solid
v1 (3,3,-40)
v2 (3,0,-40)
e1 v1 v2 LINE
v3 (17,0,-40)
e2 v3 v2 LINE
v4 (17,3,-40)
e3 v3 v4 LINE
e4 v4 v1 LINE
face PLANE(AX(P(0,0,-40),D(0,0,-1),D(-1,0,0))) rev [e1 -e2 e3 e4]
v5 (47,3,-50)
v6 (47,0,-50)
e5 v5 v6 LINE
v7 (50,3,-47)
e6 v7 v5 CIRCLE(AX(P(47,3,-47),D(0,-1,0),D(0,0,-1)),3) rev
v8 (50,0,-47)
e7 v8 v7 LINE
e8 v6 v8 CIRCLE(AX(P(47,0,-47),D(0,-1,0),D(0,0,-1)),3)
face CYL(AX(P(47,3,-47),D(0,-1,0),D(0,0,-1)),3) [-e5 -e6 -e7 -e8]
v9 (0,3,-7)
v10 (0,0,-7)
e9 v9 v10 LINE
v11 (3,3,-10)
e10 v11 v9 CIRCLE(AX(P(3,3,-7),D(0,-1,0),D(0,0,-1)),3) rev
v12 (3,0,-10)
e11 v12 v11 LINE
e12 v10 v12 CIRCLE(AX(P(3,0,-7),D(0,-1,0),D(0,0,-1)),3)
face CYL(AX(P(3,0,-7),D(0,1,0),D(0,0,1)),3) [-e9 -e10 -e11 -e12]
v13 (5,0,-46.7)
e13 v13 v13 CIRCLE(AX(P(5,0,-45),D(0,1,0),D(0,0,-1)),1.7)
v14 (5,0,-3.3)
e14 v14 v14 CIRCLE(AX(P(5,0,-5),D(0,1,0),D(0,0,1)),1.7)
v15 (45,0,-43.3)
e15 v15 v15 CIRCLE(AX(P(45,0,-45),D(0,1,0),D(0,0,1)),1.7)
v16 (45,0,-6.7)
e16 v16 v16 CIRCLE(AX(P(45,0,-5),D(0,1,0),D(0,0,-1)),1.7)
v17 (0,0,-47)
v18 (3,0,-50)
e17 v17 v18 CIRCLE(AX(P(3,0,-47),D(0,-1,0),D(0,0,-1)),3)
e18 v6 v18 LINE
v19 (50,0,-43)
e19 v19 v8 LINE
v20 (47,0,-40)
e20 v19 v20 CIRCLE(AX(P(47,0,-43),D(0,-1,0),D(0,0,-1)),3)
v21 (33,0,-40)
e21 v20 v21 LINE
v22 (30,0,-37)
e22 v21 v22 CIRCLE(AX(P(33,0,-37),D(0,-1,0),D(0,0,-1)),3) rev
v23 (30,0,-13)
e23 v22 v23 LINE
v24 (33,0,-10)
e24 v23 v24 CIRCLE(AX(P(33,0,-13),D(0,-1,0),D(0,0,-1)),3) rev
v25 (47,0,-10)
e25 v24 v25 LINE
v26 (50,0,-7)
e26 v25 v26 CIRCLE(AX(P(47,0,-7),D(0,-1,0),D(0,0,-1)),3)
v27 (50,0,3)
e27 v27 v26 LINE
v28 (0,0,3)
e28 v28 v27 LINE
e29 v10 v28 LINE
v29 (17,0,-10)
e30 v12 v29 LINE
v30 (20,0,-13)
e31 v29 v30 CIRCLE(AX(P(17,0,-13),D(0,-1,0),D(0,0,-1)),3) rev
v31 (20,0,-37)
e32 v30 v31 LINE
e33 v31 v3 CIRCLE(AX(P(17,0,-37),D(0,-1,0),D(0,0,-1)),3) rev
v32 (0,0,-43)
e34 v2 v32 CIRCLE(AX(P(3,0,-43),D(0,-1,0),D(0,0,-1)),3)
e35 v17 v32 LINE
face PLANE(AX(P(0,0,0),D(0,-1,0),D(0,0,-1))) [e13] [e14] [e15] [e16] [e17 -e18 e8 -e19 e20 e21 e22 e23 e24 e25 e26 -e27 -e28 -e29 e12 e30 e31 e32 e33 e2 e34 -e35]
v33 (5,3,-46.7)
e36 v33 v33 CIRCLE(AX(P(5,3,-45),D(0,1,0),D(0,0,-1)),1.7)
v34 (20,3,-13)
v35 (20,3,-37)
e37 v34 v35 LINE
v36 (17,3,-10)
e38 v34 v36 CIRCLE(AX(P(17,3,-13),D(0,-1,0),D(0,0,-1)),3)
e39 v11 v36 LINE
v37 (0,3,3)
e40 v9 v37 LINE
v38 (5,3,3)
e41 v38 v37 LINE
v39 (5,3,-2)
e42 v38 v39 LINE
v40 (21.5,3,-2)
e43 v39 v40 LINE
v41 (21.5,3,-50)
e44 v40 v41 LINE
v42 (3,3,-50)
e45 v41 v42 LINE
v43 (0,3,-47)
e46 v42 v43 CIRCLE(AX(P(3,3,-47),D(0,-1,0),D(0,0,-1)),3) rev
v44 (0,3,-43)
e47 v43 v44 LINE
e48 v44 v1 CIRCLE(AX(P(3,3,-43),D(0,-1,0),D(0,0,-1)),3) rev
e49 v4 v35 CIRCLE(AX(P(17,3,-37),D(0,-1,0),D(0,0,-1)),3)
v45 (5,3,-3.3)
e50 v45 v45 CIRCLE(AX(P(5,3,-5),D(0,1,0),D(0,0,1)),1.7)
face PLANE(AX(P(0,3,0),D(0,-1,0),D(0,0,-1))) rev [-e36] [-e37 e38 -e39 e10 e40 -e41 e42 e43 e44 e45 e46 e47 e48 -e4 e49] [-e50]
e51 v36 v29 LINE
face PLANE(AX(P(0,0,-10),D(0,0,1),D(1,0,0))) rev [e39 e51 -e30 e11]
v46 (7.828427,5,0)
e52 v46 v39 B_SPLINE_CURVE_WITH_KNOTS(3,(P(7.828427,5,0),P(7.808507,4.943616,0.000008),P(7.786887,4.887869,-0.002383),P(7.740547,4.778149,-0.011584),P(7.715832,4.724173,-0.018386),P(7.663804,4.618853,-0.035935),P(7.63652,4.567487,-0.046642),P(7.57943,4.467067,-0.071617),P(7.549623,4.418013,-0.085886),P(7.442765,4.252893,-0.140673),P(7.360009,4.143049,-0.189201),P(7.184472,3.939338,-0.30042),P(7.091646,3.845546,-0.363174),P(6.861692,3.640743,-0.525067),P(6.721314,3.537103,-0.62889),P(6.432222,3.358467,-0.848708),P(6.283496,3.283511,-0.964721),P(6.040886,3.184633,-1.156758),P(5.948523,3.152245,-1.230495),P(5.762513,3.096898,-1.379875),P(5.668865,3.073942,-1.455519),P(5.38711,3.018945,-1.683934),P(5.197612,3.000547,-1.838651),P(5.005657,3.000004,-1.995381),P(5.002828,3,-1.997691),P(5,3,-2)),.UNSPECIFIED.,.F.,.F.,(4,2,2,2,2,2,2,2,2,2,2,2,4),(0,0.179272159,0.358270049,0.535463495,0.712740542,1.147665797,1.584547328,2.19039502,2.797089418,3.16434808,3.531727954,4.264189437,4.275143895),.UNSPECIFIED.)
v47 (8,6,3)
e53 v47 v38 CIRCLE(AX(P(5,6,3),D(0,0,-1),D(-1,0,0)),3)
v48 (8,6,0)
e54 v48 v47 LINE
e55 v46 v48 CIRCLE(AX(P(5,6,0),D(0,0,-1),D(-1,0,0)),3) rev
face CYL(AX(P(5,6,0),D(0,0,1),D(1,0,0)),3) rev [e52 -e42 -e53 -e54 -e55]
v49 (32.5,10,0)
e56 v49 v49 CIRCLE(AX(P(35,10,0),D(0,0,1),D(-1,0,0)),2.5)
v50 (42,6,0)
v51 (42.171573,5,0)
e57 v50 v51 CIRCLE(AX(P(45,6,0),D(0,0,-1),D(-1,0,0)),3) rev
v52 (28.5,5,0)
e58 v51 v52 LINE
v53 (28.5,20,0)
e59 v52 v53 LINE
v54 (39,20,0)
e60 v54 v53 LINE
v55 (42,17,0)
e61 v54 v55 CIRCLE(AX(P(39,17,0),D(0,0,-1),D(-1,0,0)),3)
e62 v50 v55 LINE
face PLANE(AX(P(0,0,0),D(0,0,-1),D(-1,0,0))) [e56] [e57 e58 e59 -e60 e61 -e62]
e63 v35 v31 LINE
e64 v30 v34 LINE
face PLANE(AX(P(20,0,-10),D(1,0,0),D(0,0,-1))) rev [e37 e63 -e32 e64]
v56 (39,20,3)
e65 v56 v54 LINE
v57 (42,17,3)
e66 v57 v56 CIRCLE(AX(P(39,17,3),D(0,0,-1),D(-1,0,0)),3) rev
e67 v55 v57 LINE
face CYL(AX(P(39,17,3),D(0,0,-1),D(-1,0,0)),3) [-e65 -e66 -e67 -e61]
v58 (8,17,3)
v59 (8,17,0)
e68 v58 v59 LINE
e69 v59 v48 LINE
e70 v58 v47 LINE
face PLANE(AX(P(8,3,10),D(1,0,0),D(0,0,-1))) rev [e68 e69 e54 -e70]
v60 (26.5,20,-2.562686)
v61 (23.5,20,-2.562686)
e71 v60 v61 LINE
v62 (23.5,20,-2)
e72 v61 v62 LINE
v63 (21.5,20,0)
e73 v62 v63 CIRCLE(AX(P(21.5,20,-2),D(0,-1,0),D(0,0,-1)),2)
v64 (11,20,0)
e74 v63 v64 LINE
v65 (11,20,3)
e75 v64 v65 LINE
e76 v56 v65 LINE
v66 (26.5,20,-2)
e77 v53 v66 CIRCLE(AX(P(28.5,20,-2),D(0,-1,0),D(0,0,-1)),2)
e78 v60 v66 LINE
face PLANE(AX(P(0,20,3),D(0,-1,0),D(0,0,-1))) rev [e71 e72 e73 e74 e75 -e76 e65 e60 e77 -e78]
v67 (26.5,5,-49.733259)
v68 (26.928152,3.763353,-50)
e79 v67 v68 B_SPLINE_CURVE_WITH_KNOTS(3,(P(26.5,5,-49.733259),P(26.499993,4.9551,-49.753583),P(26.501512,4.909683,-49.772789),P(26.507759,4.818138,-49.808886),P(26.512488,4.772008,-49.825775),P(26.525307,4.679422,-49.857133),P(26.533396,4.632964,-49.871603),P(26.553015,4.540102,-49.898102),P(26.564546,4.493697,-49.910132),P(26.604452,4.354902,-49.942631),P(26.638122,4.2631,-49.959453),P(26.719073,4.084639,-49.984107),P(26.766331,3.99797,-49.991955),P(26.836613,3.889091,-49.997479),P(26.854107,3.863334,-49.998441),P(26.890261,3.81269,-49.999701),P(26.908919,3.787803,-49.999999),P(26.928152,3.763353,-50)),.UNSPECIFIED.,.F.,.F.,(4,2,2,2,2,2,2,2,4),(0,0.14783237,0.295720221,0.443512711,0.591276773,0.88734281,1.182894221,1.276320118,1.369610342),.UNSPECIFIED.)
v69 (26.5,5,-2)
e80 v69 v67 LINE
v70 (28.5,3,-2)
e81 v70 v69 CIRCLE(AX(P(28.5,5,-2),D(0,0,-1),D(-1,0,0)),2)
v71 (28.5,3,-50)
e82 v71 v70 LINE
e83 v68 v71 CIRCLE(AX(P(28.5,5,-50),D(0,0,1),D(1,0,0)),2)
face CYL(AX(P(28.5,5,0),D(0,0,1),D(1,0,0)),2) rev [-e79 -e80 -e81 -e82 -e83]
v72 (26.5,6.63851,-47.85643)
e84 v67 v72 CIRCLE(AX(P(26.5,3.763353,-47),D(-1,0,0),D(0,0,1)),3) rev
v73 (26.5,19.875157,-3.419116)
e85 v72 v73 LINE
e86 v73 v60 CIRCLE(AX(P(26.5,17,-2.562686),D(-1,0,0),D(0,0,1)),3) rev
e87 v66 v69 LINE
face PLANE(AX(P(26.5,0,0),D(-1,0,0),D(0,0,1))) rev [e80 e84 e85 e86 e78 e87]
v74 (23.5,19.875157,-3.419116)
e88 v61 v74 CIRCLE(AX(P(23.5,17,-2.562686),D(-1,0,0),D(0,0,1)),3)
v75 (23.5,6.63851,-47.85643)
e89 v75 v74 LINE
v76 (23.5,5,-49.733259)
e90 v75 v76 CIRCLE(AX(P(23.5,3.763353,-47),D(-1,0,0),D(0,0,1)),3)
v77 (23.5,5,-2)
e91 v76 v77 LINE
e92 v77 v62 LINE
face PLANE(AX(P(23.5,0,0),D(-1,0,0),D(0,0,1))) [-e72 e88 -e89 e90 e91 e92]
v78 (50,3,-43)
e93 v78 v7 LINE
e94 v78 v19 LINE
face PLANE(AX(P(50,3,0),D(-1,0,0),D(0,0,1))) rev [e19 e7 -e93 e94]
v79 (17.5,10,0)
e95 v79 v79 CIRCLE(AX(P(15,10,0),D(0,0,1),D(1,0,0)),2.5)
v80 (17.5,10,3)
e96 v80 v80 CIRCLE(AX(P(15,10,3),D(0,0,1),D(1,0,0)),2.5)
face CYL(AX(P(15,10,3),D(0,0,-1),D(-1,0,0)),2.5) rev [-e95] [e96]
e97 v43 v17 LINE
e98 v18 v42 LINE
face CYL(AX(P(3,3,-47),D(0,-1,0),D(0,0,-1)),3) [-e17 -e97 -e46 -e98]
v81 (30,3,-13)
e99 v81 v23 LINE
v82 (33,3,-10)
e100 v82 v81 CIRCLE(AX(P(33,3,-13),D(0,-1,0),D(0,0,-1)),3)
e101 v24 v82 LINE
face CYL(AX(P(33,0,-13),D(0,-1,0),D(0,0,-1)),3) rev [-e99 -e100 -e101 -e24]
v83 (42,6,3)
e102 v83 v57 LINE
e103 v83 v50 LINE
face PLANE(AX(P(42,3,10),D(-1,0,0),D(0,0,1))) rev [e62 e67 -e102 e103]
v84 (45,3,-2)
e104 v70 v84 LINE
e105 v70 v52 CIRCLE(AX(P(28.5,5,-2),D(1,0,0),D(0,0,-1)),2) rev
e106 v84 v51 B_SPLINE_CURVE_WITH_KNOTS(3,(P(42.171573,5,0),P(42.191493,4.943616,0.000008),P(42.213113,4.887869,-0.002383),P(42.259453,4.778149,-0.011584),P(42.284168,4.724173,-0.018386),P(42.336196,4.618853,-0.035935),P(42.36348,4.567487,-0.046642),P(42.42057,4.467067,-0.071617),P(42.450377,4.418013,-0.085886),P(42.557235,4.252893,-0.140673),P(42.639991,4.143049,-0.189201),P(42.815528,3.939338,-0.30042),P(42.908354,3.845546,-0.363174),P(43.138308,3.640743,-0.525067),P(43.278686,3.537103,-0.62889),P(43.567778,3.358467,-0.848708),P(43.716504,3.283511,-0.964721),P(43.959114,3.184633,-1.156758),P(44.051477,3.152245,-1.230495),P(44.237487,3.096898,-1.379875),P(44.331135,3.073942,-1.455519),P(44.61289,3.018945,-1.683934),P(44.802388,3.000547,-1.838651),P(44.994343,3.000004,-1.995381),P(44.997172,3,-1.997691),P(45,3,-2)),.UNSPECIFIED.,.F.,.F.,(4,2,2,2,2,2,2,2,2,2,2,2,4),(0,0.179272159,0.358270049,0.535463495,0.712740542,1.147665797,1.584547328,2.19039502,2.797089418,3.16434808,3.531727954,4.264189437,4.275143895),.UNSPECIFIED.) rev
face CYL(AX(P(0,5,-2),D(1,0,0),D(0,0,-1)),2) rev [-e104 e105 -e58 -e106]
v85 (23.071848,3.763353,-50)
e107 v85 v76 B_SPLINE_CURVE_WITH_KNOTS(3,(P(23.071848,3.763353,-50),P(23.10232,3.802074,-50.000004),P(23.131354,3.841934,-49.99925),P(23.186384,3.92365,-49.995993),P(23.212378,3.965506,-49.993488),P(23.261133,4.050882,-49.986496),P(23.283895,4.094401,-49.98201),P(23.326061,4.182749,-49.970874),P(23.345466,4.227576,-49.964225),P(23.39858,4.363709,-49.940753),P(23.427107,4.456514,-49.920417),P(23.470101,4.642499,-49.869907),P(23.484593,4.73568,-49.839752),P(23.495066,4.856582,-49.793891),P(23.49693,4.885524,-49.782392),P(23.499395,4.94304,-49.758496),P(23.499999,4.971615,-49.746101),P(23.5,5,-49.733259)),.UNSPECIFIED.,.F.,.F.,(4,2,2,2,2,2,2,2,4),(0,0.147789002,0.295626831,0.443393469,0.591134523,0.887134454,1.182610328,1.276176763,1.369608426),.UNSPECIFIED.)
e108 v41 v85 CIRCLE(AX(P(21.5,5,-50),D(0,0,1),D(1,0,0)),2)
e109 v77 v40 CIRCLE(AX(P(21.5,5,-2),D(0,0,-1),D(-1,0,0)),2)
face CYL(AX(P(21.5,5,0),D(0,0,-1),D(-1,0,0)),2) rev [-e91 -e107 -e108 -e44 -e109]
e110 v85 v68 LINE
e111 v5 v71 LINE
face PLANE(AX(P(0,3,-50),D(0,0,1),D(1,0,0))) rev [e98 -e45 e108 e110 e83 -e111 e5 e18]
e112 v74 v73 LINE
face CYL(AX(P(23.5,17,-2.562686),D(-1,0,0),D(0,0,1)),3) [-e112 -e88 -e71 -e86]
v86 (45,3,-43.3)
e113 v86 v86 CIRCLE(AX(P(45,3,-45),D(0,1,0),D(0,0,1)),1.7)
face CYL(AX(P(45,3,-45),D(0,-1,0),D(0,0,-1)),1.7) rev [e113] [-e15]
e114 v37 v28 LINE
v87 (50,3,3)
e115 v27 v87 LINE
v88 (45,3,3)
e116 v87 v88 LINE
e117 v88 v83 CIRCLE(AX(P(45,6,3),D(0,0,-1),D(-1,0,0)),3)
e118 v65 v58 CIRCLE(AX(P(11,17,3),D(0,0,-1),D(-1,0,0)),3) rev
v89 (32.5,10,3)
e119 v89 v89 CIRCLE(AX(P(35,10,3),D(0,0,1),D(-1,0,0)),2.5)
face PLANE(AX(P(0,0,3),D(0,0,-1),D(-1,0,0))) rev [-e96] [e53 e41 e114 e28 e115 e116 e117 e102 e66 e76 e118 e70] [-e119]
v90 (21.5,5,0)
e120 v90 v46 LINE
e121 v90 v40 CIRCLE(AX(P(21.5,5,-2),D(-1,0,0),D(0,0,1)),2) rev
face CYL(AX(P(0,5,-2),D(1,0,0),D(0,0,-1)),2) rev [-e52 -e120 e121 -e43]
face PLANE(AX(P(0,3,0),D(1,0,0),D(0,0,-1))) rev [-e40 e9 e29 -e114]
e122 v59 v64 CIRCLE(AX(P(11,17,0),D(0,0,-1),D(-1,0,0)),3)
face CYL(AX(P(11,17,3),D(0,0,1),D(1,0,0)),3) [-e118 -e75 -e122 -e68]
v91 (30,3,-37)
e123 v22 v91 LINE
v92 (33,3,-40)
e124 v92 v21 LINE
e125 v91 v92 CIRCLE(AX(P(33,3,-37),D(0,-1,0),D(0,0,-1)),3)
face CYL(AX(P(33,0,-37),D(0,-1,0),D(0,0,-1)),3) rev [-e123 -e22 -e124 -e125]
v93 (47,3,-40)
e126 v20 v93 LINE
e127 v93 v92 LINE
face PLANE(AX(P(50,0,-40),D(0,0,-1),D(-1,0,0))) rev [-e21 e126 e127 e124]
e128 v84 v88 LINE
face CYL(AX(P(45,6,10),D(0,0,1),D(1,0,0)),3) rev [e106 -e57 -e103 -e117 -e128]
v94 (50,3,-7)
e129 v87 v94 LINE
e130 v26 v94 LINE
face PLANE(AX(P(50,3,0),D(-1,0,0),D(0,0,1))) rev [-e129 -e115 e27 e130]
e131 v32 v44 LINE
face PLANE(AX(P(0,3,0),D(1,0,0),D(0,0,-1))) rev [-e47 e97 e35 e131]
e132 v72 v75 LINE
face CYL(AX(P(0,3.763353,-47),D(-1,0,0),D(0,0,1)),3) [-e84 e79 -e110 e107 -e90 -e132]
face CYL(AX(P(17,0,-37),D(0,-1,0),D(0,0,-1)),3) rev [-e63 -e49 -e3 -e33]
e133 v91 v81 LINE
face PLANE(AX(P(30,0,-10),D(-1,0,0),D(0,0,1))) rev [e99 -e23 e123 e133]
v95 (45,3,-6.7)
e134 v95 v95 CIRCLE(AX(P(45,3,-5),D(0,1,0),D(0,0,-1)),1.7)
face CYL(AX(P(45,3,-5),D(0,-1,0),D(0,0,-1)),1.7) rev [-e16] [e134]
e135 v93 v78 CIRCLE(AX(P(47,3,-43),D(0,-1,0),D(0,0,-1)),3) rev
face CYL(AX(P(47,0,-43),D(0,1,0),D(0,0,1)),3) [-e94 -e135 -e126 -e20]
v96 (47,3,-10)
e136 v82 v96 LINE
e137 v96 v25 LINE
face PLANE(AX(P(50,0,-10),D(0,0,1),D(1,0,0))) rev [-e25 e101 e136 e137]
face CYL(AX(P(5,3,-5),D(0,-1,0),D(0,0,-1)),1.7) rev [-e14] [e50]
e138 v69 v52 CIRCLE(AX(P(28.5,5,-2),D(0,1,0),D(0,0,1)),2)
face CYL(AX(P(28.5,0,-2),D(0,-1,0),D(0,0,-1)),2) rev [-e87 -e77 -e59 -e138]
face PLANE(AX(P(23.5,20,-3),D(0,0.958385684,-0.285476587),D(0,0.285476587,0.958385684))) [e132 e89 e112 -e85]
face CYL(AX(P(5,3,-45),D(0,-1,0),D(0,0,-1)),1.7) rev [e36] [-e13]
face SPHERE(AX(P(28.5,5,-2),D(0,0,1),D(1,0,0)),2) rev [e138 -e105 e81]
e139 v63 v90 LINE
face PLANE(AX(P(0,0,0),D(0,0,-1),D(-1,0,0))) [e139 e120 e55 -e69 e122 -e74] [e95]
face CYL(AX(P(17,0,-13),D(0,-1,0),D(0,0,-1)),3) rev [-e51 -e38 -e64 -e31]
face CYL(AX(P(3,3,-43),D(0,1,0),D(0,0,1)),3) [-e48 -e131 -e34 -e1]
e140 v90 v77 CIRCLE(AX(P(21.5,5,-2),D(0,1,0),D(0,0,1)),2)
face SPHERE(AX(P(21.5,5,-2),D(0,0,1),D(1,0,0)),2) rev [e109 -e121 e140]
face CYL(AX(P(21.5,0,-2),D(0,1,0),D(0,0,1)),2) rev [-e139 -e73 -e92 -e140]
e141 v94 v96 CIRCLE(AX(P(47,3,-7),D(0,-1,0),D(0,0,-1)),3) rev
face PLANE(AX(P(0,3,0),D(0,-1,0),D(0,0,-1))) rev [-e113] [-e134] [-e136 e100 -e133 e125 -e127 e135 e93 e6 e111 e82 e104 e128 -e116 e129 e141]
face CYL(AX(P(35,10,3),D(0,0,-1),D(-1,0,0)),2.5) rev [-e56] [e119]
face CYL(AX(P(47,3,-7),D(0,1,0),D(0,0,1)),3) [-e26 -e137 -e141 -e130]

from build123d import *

# Parameters (mm, degrees)
ESQUISSE1_W             = 50
ESQUISSE1_H             = 50
ESQUISSE1_R             = 1.7
BOSS_EXTRU_1_DEPTH      = 3
ESQUISSE2_W             = 50
ESQUISSE2_H             = 20
ESQUISSE2_R             = 2.5
BOSS_EXTRU_2_DEPTH      = 3
BOSS_EXTRU_3_DEPTH      = 1.5
BOSS_EXTRU_3_DEPTH_BACK = 1.5
ESQUISSE5_W             = 8
ESQUISSE5_H             = 17
ENL_V_MAT_EXTRU_2_DEPTH = 10
CONG_1_R                = 3
CONG_2_R                = 3
CONG_3_R                = 2
ESQUISSE4_W             = 20
ESQUISSE4_H             = 30
ENL_V_MAT_EXTRU_1_DEPTH = 73.725511411
CONG_4_R                = 3


with BuildPart() as part:
    # Esquisse1 → Boss.-Extru.1 (new body)
    with BuildSketch(Plane(origin=(0, 0, 0), x_dir=(1, 0, 0), z_dir=(0, 1, 0))):
        with Locations((25, 25)):
            Rectangle(ESQUISSE1_W, ESQUISSE1_H)
        with Locations(Location((5, 5, 0), (0, 0, 270))):
            Circle(ESQUISSE1_R, mode=Mode.SUBTRACT)
        with Locations(Location((5, 45, 0), (0, 0, 90))):
            Circle(ESQUISSE1_R, mode=Mode.SUBTRACT)
        with Locations(Location((45, 45, 0), (0, 0, 270))):
            Circle(ESQUISSE1_R, mode=Mode.SUBTRACT)
        with Locations(Location((45, 5, 0), (0, 0, 90))):
            Circle(ESQUISSE1_R, mode=Mode.SUBTRACT)
    extrude(amount=BOSS_EXTRU_1_DEPTH)

    # Esquisse2 → Boss.-Extru.2 (add)
    with BuildSketch(Plane.XY):
        with Locations((25, 10)):
            Rectangle(ESQUISSE2_W, ESQUISSE2_H)
        with Locations((15, 10)):
            Circle(ESQUISSE2_R, mode=Mode.SUBTRACT)
        with Locations(Location((35, 10, 0), (0, 0, 180))):
            Circle(ESQUISSE2_R, mode=Mode.SUBTRACT)
    extrude(amount=BOSS_EXTRU_2_DEPTH)

    # Esquisse3 → Boss.-Extru.3 (add, two sides: drawn at the far end of the back side and taken through both)
    with BuildSketch(Plane(origin=(25, 0, 0), x_dir=(0, 0, -1), z_dir=(1, 0, 0)).offset(-BOSS_EXTRU_3_DEPTH_BACK)):
        Polygon((0, 20), (3, 20), (50, 6), (50, 3), (0, 3), align=None)
    extrude(amount=BOSS_EXTRU_3_DEPTH + BOSS_EXTRU_3_DEPTH_BACK)

    # Esquisse5 → Enlèv. mat.-Extru.2 (cut)
    with BuildSketch(Plane(origin=(0, 0, 0), x_dir=(-1, 0, 0), z_dir=(0, 0, -1))):
        with Locations((-4, 11.5)):
            Rectangle(ESQUISSE5_W, ESQUISSE5_H)
        with Locations((-46, 11.5)):
            Rectangle(ESQUISSE5_W, ESQUISSE5_H)
    extrude(amount=-ENL_V_MAT_EXTRU_2_DEPTH, mode=Mode.SUBTRACT)

    # Congé1
    cong_1_edges = [part.edges().sort_by_distance(p)[0] for p in [
        (0, 1.5, -50),
        (50, 1.5, -50),
    ]]
    fillet(cong_1_edges, radius=CONG_1_R)

    # Congé2
    cong_2_edges = [part.edges().sort_by_distance(p)[0] for p in [
        (25, 20, -3),
        (25, 6, -50),
        (42, 20, 1.5),
        (8, 20, 1.5),
        (8, 3, 1.5),
        (42, 3, 1.5),
    ]]
    fillet(cong_2_edges, radius=CONG_2_R)

    # Congé3
    cong_3_edges = [part.edges().sort_by_distance(p)[0] for p in [
        (26.5, 11.5, 0),
    ]]
    fillet(cong_3_edges, radius=CONG_3_R)
    cong_3_2_edges = [part.edges().sort_by_distance(p)[0] for p in [
        (36.75, 3, 0),
    ]]
    fillet(cong_3_2_edges, radius=CONG_3_R)
    cong_3_3_edges = [part.edges().sort_by_distance(p)[0] for p in [
        (23.5, 11.5, 0),
    ]]
    fillet(cong_3_3_edges, radius=CONG_3_R)
    cong_3_4_edges = [part.edges().sort_by_distance(p)[0] for p in [
        (23.5, 3, -26),
    ]]
    fillet(cong_3_4_edges, radius=CONG_3_R)

    # Esquisse4 → Enlèv. mat.-Extru.1 (cut, through all)
    with BuildSketch(Plane(origin=(0, 3, 0), x_dir=(1, 0, 0), z_dir=(0, 1, 0))):
        with Locations((40, 25)):
            Rectangle(ESQUISSE4_W, ESQUISSE4_H)
        with Locations((10, 25)):
            Rectangle(ESQUISSE4_W, ESQUISSE4_H)
    extrude(amount=-ENL_V_MAT_EXTRU_1_DEPTH, mode=Mode.SUBTRACT)

    # Congé4
    cong_4_edges = [part.edges().sort_by_distance(p)[0] for p in [
        (50, 1.5, -40),
        (50, 1.5, -10),
        (30, 1.5, -10),
        (30, 1.5, -40),
        (20, 1.5, -10),
        (0, 1.5, -10),
        (0, 1.5, -40),
        (20, 1.5, -40),
    ]]
    fillet(cong_4_edges, radius=CONG_4_R)


solid = part.part
